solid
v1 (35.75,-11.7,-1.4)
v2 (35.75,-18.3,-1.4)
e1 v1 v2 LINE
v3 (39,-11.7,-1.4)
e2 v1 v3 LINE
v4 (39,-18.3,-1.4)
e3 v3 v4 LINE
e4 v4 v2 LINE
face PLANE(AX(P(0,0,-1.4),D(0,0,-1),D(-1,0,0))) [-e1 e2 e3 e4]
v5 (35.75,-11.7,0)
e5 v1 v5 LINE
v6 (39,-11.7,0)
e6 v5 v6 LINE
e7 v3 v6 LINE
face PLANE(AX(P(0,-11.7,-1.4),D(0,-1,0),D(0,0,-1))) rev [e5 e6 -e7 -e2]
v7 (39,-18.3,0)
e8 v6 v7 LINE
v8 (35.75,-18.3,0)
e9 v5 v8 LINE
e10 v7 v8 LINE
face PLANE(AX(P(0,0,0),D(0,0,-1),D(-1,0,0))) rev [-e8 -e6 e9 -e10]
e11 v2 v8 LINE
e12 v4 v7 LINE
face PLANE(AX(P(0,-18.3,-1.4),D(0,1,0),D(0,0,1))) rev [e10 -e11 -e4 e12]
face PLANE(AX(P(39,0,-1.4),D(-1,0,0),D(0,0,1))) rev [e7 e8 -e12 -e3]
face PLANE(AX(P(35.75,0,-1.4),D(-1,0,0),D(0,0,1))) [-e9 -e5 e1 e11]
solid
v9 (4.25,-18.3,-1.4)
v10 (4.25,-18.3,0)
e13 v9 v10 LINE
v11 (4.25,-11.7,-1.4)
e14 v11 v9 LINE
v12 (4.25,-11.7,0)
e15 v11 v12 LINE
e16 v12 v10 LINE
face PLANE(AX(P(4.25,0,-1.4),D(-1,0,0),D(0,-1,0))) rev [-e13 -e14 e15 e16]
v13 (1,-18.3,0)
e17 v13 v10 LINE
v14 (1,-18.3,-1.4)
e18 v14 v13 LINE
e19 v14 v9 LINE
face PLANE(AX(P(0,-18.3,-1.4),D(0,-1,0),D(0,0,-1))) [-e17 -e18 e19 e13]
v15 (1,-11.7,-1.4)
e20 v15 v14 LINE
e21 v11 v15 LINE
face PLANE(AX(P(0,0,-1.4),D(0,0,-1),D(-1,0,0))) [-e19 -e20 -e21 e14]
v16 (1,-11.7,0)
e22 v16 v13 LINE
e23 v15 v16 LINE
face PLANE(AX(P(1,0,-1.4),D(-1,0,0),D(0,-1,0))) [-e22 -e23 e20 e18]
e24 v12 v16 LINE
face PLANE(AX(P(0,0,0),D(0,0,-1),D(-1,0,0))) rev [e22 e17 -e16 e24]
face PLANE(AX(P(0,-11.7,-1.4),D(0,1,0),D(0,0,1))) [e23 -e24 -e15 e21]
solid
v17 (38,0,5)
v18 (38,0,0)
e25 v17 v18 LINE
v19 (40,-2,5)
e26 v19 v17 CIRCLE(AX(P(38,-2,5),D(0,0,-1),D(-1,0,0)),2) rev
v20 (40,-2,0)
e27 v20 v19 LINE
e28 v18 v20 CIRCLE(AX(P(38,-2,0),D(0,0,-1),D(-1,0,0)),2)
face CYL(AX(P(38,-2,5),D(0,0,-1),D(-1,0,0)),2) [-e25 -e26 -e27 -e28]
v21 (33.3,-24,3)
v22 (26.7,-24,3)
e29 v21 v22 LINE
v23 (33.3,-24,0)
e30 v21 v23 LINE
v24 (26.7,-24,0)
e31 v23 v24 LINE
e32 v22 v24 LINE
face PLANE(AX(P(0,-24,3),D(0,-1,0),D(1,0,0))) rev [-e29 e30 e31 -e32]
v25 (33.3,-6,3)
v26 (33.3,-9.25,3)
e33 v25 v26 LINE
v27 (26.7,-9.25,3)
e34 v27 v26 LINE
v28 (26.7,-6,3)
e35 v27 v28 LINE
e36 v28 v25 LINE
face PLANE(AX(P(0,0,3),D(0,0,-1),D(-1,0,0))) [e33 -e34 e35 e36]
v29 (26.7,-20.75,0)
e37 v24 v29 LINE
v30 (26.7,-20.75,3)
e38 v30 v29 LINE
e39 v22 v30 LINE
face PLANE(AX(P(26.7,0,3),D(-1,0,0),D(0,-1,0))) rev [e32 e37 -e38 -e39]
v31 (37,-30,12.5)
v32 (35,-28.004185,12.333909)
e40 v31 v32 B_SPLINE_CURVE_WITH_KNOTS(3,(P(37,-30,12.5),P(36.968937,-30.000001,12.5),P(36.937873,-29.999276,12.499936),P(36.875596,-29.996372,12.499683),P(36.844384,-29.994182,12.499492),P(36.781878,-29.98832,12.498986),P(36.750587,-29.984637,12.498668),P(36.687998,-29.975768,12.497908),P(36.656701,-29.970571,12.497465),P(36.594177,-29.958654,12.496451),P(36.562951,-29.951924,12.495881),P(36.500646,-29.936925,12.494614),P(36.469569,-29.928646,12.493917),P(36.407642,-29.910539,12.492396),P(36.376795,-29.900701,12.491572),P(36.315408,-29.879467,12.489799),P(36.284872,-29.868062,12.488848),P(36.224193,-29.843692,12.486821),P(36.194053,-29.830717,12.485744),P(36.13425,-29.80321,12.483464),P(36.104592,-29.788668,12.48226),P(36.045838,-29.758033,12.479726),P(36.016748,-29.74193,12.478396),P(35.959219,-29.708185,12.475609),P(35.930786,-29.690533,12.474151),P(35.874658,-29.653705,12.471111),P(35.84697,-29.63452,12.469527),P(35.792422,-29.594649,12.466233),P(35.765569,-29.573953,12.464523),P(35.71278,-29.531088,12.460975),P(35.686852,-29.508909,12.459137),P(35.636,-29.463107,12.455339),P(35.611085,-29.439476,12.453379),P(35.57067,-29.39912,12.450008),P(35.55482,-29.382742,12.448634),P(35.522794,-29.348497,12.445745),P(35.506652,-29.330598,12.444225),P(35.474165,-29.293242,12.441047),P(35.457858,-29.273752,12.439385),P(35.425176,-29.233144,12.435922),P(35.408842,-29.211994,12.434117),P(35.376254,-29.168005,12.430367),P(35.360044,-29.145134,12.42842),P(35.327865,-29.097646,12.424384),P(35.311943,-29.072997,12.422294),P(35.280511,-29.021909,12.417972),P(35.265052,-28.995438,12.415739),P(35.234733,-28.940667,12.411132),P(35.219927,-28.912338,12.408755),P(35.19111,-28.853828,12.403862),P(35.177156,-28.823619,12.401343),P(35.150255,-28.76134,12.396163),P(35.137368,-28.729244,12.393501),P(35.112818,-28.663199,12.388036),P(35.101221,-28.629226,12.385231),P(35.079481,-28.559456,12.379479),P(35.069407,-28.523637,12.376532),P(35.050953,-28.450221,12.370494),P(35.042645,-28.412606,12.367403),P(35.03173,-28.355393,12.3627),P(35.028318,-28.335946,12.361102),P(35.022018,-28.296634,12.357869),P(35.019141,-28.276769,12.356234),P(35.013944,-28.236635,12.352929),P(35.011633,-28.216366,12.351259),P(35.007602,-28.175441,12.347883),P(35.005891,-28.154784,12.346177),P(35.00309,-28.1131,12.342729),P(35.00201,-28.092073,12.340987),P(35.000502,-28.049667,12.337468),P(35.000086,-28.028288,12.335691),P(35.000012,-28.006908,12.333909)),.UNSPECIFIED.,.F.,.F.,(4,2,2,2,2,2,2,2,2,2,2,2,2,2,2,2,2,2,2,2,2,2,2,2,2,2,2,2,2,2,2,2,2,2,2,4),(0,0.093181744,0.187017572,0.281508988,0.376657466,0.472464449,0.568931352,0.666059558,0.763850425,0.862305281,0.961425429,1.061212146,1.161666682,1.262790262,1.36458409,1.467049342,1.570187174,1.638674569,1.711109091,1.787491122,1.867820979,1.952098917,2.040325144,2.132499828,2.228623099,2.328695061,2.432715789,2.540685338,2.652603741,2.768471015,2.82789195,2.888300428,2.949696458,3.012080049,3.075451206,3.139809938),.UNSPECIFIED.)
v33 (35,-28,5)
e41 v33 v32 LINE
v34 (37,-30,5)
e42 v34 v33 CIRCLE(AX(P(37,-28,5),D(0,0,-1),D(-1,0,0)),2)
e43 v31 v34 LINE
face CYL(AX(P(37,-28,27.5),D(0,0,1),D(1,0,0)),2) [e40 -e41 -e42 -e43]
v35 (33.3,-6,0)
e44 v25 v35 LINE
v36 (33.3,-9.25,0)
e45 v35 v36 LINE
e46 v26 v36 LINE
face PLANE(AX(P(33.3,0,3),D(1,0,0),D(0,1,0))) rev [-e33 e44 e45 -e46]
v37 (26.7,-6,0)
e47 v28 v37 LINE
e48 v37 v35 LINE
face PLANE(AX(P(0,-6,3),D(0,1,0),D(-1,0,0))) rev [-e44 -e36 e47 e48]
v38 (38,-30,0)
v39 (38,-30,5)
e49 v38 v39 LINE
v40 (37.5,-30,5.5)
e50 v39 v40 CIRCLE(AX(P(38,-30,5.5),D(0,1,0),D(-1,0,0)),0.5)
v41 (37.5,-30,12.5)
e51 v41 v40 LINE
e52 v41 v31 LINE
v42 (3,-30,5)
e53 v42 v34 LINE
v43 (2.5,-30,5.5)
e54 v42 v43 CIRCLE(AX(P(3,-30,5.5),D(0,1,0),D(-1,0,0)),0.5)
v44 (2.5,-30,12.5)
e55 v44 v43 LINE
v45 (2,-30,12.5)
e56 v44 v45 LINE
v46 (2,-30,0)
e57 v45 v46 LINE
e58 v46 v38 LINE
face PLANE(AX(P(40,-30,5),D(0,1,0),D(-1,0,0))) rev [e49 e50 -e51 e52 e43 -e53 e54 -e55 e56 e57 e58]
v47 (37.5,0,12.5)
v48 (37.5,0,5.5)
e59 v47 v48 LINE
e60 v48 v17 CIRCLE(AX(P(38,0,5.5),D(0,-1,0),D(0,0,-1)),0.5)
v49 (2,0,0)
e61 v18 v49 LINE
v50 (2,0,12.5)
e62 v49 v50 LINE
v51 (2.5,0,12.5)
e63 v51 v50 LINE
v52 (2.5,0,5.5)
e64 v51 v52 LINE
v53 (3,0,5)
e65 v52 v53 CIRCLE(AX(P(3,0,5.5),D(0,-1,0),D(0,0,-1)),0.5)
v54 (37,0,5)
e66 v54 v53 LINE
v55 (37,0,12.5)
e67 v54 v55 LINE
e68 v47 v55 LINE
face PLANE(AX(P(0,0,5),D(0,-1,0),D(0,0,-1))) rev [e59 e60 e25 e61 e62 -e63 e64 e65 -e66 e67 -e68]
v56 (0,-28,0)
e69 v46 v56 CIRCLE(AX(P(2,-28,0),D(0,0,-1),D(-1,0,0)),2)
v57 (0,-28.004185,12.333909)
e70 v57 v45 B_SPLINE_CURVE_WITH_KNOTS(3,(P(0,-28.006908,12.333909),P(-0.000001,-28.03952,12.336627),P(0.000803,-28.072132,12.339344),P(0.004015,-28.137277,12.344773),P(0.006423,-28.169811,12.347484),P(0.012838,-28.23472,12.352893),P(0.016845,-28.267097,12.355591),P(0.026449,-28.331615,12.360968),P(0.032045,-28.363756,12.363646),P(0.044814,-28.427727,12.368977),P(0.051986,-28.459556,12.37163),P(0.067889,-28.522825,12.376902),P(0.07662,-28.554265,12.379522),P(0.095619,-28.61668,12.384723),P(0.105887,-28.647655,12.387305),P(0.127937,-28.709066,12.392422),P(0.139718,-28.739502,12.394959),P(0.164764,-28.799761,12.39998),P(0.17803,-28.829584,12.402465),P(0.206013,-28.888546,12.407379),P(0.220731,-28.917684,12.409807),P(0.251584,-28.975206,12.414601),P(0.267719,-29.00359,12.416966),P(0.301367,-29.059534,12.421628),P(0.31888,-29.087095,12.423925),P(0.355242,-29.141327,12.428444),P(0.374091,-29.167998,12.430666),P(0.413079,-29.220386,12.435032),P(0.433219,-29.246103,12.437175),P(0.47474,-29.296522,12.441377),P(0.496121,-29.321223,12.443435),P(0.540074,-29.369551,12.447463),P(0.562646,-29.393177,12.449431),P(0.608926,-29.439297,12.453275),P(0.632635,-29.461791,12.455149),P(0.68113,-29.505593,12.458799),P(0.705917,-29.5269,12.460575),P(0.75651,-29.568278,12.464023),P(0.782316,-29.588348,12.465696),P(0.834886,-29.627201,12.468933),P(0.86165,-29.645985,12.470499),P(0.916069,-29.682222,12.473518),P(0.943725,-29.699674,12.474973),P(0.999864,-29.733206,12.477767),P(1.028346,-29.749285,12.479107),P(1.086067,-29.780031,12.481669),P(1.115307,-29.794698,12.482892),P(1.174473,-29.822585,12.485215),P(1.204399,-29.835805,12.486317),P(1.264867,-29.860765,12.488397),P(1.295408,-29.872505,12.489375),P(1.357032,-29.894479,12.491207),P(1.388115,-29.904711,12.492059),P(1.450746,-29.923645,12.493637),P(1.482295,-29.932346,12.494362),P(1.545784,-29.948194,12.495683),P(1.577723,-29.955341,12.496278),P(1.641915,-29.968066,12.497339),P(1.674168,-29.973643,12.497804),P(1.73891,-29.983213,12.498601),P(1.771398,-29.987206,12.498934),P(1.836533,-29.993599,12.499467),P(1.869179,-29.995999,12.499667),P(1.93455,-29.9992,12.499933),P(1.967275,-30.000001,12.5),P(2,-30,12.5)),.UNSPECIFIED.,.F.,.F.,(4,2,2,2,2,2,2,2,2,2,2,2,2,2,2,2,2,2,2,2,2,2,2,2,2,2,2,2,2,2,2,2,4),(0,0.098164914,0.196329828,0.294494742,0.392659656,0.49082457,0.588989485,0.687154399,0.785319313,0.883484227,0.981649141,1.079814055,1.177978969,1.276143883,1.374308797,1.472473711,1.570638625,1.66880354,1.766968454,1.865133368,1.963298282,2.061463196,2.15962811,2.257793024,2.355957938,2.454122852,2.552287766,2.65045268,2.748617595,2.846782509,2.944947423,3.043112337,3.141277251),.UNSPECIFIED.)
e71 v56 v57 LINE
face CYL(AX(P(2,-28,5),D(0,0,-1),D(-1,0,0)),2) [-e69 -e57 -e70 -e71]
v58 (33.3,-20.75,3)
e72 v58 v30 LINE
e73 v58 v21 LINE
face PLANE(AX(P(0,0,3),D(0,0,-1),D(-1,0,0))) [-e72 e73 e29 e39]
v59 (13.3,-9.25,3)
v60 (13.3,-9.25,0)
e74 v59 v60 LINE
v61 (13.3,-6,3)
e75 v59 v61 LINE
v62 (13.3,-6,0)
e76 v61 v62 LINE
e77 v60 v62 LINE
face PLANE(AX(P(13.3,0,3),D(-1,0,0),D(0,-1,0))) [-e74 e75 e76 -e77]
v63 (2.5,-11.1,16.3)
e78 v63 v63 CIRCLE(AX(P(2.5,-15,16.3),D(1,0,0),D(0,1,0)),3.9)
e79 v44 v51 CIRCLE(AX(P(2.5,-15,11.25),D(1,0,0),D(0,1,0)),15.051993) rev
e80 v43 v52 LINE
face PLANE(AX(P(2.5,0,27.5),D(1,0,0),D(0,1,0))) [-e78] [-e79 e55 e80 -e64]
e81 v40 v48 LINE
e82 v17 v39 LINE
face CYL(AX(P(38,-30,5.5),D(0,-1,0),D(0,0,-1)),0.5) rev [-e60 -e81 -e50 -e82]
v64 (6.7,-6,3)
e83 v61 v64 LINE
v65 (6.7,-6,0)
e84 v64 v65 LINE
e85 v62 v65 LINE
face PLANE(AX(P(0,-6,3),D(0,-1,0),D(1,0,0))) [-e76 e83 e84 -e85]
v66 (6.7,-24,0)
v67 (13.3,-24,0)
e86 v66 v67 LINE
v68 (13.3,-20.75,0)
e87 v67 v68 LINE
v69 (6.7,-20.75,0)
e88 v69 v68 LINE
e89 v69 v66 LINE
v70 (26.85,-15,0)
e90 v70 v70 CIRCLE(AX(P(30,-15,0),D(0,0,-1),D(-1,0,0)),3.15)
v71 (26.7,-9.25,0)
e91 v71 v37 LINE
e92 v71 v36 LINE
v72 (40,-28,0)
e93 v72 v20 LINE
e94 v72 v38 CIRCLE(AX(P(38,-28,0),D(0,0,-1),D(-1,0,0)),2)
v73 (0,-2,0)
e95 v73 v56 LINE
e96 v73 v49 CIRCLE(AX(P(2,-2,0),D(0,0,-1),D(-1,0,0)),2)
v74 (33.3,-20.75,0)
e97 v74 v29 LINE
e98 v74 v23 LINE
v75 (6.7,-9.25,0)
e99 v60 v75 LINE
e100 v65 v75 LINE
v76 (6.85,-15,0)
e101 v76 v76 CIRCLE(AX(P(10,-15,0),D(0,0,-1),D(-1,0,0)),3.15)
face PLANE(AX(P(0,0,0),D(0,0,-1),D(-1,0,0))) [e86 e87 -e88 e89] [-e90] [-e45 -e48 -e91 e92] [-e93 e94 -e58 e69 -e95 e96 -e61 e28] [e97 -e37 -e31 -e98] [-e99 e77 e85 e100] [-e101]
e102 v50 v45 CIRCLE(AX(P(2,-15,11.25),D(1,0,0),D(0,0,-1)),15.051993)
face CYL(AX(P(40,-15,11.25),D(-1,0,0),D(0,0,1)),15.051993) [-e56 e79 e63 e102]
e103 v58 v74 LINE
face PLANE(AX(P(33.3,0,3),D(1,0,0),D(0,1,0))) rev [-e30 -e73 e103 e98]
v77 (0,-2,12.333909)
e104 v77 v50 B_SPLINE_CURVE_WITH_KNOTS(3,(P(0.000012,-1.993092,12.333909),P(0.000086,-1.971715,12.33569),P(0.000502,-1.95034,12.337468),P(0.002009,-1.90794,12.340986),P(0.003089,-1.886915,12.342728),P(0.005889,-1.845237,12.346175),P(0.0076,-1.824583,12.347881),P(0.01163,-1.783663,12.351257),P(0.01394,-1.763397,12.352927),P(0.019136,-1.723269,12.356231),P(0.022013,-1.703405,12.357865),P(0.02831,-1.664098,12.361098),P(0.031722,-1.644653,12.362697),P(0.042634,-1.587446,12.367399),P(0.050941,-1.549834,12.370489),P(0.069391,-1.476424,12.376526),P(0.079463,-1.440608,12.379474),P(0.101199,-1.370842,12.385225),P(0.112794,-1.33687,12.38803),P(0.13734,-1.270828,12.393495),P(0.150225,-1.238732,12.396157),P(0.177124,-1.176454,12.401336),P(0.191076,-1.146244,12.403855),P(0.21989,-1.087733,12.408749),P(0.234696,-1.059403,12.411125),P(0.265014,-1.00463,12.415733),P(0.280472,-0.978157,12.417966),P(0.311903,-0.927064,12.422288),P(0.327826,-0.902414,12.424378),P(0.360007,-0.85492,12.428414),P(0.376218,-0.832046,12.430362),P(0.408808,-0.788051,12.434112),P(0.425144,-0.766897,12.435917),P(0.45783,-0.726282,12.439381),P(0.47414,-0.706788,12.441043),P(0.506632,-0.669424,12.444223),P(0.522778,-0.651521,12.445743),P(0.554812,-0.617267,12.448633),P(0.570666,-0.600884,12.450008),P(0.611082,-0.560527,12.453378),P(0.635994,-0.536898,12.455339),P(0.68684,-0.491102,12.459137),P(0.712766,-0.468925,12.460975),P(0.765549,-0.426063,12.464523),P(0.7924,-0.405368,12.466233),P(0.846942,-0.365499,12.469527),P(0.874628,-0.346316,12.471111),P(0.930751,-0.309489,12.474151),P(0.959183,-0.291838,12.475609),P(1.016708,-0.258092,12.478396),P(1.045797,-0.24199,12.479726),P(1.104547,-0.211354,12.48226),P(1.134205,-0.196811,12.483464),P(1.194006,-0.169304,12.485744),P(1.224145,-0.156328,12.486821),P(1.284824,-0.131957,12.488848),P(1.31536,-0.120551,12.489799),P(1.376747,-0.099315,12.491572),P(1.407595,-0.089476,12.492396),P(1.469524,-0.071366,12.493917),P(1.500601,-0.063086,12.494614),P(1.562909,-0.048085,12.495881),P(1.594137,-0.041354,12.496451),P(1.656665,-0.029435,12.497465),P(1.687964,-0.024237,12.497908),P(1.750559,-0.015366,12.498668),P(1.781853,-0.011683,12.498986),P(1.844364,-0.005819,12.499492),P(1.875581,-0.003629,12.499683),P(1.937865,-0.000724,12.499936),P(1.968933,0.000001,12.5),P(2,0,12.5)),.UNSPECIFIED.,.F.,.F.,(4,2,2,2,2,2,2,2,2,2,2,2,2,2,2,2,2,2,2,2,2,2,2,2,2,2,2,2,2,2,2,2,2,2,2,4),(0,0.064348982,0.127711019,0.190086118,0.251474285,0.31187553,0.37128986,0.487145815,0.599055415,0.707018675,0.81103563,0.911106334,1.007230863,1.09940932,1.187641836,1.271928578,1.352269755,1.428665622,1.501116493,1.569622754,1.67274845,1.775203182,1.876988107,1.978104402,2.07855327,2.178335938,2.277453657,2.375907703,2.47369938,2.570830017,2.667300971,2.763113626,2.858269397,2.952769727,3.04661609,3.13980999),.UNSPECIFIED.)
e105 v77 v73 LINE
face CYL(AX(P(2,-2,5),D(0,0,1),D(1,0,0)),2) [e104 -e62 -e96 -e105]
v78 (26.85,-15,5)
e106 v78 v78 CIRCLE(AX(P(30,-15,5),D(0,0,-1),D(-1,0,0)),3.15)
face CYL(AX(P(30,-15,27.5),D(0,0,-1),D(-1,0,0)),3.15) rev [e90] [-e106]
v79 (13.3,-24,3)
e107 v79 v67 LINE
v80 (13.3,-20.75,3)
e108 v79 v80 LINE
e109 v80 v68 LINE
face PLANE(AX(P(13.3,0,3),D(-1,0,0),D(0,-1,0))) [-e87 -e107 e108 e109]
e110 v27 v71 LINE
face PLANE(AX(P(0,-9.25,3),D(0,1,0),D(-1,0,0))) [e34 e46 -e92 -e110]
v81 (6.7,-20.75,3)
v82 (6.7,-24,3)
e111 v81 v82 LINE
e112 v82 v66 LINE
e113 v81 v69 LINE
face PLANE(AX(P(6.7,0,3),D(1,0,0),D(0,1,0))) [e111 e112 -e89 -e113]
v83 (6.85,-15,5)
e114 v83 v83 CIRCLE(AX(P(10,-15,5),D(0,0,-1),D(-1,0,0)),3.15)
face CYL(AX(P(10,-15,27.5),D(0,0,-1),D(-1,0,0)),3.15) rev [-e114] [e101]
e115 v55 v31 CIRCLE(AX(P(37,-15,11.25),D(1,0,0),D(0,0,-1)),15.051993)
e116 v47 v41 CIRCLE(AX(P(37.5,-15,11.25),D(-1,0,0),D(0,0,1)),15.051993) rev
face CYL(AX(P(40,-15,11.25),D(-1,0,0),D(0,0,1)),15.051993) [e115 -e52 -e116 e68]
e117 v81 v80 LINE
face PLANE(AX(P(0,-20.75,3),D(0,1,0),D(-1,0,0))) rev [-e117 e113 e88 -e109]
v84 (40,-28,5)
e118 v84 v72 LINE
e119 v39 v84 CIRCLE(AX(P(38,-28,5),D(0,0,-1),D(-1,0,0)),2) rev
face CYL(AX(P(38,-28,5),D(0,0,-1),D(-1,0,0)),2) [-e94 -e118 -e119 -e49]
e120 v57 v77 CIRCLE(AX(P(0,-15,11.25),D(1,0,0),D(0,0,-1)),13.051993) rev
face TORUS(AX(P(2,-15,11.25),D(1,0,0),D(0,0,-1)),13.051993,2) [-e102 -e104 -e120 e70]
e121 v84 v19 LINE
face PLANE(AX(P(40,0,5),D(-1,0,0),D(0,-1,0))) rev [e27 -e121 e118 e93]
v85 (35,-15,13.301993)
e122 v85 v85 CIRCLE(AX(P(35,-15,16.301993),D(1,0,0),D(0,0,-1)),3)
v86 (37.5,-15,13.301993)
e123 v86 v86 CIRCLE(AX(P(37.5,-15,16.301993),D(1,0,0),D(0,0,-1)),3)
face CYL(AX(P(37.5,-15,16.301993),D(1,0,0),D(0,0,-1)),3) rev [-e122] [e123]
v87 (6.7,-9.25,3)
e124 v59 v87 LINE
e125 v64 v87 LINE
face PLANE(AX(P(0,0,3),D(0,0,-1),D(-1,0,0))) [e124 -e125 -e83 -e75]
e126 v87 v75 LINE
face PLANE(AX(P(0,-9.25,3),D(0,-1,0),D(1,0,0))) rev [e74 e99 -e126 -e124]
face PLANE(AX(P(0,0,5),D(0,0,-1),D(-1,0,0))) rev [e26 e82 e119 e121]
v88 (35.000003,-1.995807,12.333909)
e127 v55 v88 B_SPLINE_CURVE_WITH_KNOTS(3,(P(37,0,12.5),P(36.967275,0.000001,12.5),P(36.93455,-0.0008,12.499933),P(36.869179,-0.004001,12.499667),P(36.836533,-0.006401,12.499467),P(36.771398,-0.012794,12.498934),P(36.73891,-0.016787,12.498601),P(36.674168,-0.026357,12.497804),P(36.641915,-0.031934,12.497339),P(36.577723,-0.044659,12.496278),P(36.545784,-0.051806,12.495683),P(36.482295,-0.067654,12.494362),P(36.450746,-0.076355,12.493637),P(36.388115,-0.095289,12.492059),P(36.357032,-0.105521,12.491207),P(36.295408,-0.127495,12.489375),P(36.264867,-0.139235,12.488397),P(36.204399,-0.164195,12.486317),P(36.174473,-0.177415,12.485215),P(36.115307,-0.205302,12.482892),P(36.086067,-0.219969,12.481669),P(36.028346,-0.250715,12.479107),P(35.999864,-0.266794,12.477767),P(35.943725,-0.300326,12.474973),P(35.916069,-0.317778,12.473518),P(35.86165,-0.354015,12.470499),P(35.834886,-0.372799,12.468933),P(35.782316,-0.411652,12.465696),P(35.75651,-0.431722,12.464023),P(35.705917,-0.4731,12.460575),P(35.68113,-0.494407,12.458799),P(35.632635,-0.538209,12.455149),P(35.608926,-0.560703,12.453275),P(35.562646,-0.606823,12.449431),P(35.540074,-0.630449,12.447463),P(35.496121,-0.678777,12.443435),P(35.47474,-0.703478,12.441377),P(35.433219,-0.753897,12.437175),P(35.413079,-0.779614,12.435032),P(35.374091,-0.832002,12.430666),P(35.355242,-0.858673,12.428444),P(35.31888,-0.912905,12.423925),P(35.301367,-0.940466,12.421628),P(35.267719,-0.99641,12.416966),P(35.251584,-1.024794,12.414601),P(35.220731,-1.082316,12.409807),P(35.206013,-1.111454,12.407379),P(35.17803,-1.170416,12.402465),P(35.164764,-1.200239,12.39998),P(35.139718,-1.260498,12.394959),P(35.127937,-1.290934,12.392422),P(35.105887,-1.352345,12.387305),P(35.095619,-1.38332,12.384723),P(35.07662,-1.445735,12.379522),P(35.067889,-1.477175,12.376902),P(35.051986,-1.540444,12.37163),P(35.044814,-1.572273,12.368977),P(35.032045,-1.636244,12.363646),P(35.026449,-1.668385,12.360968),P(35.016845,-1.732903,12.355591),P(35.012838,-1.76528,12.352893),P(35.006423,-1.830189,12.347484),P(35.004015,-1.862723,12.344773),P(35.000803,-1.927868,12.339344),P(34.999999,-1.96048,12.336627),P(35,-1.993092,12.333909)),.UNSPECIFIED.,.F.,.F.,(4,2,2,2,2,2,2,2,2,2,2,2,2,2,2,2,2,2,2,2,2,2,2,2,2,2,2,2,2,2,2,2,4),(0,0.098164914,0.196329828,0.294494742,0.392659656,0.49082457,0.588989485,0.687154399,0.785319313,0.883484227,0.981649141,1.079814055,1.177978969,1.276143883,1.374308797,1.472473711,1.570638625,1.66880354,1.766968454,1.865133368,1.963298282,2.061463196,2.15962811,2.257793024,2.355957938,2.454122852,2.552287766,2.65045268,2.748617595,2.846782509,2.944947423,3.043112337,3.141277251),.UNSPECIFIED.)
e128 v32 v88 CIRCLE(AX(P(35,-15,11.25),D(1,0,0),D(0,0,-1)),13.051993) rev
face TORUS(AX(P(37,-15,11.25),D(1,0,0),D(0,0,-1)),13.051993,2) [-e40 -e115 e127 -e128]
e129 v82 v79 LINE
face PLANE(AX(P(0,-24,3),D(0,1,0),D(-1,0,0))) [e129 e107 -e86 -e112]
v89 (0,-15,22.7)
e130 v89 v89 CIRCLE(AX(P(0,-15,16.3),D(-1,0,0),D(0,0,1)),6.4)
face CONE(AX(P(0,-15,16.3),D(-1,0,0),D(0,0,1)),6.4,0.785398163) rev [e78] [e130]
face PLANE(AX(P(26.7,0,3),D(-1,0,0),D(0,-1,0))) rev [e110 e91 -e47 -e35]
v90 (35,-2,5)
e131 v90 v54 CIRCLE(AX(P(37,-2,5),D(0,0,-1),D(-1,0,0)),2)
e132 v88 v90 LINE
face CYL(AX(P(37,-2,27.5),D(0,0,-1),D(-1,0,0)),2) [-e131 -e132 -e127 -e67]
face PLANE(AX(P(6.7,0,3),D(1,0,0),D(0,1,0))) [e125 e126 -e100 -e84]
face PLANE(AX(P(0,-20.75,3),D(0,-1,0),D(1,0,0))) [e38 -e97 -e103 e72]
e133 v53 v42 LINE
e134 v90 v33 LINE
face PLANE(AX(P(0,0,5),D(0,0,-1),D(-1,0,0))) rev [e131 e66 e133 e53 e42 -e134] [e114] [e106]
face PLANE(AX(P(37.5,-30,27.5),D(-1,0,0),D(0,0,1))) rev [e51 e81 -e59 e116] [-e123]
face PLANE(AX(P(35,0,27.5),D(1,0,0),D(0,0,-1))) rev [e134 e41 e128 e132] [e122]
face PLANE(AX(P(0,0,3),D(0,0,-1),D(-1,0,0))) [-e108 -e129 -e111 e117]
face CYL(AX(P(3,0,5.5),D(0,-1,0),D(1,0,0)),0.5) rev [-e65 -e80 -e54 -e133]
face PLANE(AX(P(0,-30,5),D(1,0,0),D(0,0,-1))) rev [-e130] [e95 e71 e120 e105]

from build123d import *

# Parameters (mm, degrees)
SKETCH_1_W          = 40
SKETCH_1_H          = 30
EXTRUDE_1_DEPTH     = 5
SKETCH_2_W          = 2.5
SKETCH_2_H          = 30
EXTRUDE_2_DEPTH     = 27.5
SKETCH_3_W          = 6.6
SKETCH_3_H          = 3.25
CUT_EXTRUDE_1_DEPTH = 3
CUT_EXTRUDE_2_DEPTH = 58.063561053
SKETCH_3_4_W        = 3.25
SKETCH_3_4_H        = 3.3
EXTRUDE_3_DEPTH     = 1.4
SKETCH_4_W          = 2.5
SKETCH_4_H          = 30
EXTRUDE_4_DEPTH     = 22.5
CUT_EXTRUDE_3_DEPTH = 58.063561053
SKETCH_8_W          = 3
SKETCH_8_H          = 2.501
FILLET_3_R          = 0.5
FILLET_4_R          = 2


with BuildPart() as part:
    # 草图1 → 凸台-拉伸1 (new body)
    with BuildSketch(Plane.XY):
        with Locations((20, -15)):
            Rectangle(SKETCH_1_W, SKETCH_1_H)
    extrude(amount=EXTRUDE_1_DEPTH)

    # 草图2 → 凸台-拉伸2 (add)
    with BuildSketch(Plane.XY):
        with Locations((1.25, -15)):
            Rectangle(SKETCH_2_W, SKETCH_2_H)
    extrude(amount=EXTRUDE_2_DEPTH)

    # 草图3 → 切除-拉伸1 (cut)
    with BuildSketch(Plane(origin=(0, 0, 0), x_dir=(-1, 0, 0), z_dir=(0, 0, -1))):
        with Locations((-30, -7.625)):
            Rectangle(SKETCH_3_W, SKETCH_3_H)
        with Locations((-30, -22.375)):
            Rectangle(SKETCH_3_W, SKETCH_3_H)
        with Locations((-10, -22.375)):
            Rectangle(SKETCH_3_W, SKETCH_3_H)
        with Locations((-10, -7.625)):
            Rectangle(SKETCH_3_W, SKETCH_3_H)
    extrude(amount=-CUT_EXTRUDE_1_DEPTH, mode=Mode.SUBTRACT)

    # 草图3<3> → 切除-拉伸2 (cut, through all)
    with BuildSketch(Plane(origin=(0, 0, 0), x_dir=(-1, 0, 0), z_dir=(0, 0, -1))):
        with BuildLine():
            ThreePointArc((-33.15, -15), (-30, -18.15), (-26.85, -15))
            Line((-26.85, -15), (-33.15, -15))
        make_face()
        with BuildLine():
            Line((-33.15, -15), (-26.85, -15))
            ThreePointArc((-26.85, -15), (-30, -11.85), (-33.15, -15))
        make_face()
        with BuildLine():
            ThreePointArc((-13.15, -15), (-10, -18.15), (-6.85, -15))
            Line((-6.85, -15), (-13.15, -15))
        make_face()
        with BuildLine():
            Line((-13.15, -15), (-6.85, -15))
            ThreePointArc((-6.85, -15), (-10, -11.85), (-13.15, -15))
        make_face()
    extrude(amount=-CUT_EXTRUDE_2_DEPTH, mode=Mode.SUBTRACT)

    # 草图4 → 凸台-拉伸4 (add)
    with BuildSketch(Plane.XY.offset(5)):
        with Locations((36.25, -15)):
            Rectangle(SKETCH_4_W, SKETCH_4_H)
    extrude(amount=EXTRUDE_4_DEPTH)

    # 草图5 → 切除-拉伸3 (cut, through all)
    with BuildSketch(Plane.ZY):
        with BuildLine():
            Line((27.5, 0), (12.5, 0))
            ThreePointArc((12.5, 0), (26.301993223, -15), (12.5, -30))
            Line((12.5, -30), (27.5, -30))
            Line((27.5, -30), (27.5, 0))
        make_face()
    extrude(amount=-CUT_EXTRUDE_3_DEPTH, mode=Mode.SUBTRACT)

    # 草图8 → Hole Wizard M6 _1 (revolve, cut)
    with BuildSketch(Plane(origin=(37.5, -15, 16.301993223), x_dir=(0, 0, -1), z_dir=(0, 1, 0))):
        with Locations((1.5, 1.2505)):
            Rectangle(SKETCH_8_W, SKETCH_8_H)
    revolve(axis=Axis((43.85, -15, 16.301993223), (-1, 0, 0)), mode=Mode.SUBTRACT)

    # 草图10 → Hole Wizard M6 _1 2 (revolve, cut)
    with BuildSketch(Plane(origin=(0, -15, 16.3), x_dir=(0, 0, 1), z_dir=(0, 1, 0))):
        Polygon((0, 0), (0, 2.501), (3.3, 2.501), (3.3, 3.1), (6.4, 0), align=None)
    revolve(axis=Axis((-6.35, -15, 16.3), (1, 0, 0)), mode=Mode.SUBTRACT)

    # 圆角3
    fillet_3_edges = [part.edges().sort_by_distance(p)[0] for p in [
        (2.5, -15, 5),
        (37.5, -15, 5),
    ]]
    fillet(fillet_3_edges, radius=FILLET_3_R)

    # 圆角4
    # the kernel refuses this fillet: 2 mm, written as the material it takes off along each edge
    with BuildSketch(Plane(origin=(35, -30, 5), x_dir=(0, 1, 0), z_dir=(0, 0, 1)), Plane(origin=(35, 0, 5), x_dir=(1, 0, 0), z_dir=(0, 0, 1))) as fillet_4_piece_1:
        with BuildLine():
            CenterArc((FILLET_4_R, -FILLET_4_R), FILLET_4_R, 90, 90)
            Line((0, -FILLET_4_R), (-FILLET_4_R * 0.02, -FILLET_4_R))
            Line((-FILLET_4_R * 0.02, -FILLET_4_R), (-FILLET_4_R * 0.02, FILLET_4_R * 0.02))
            Line((-FILLET_4_R * 0.02, FILLET_4_R * 0.02), (FILLET_4_R, FILLET_4_R * 0.02))
            Line((FILLET_4_R, FILLET_4_R * 0.02), (FILLET_4_R, 0))
        make_face()
    extrude(amount=9.5, mode=Mode.SUBTRACT)
    with BuildSketch(Plane(origin=(0, 0, -2), x_dir=(1, 0, 0), z_dir=(0, 0, 1)), Plane(origin=(0, -30, -2), x_dir=(0, 1, 0), z_dir=(0, 0, 1))) as fillet_4_piece_2:
        with BuildLine():
            CenterArc((FILLET_4_R, -FILLET_4_R), FILLET_4_R, 90, 90)
            Line((0, -FILLET_4_R), (-FILLET_4_R * 0.02, -FILLET_4_R))
            Line((-FILLET_4_R * 0.02, -FILLET_4_R), (-FILLET_4_R * 0.02, FILLET_4_R * 0.02))
            Line((-FILLET_4_R * 0.02, FILLET_4_R * 0.02), (FILLET_4_R, FILLET_4_R * 0.02))
            Line((FILLET_4_R, FILLET_4_R * 0.02), (FILLET_4_R, 0))
        make_face()
    extrude(amount=16.5, mode=Mode.SUBTRACT)
    with BuildSketch(Plane(origin=(35, -15, 11.25), x_dir=(0, -0.998754097024609, -0.04990244158914389), z_dir=(0, 0.04990244158914389, -0.998754097024609))) as fillet_4_piece_3:
        with BuildLine():
            CenterArc((15.051993223 - FILLET_4_R, -FILLET_4_R), FILLET_4_R, 0, 90)
            Line((15.051993223 - FILLET_4_R, 0), (15.051993223 - FILLET_4_R, FILLET_4_R * 0.02))
            Line((15.051993223 - FILLET_4_R, FILLET_4_R * 0.02), (15.051993223 + FILLET_4_R * 0.02, FILLET_4_R * 0.02))
            Line((15.051993223 + FILLET_4_R * 0.02, FILLET_4_R * 0.02), (15.051993223 + FILLET_4_R * 0.02, -FILLET_4_R))
            Line((15.051993223 + FILLET_4_R * 0.02, -FILLET_4_R), (15.051993223, -FILLET_4_R))
        make_face()
    revolve(axis=Axis((35, -15, 11.25), (-1, 0, 0)), revolution_arc=185.720774622, mode=Mode.SUBTRACT)
    with BuildSketch(Plane(origin=(0, -15, 11.25), x_dir=(0, 0.9987540970246119, -0.04990244158908723), z_dir=(0, -0.04990244158908723, -0.9987540970246119))) as fillet_4_piece_4:
        with BuildLine():
            CenterArc((15.051993223 - FILLET_4_R, FILLET_4_R), FILLET_4_R, 270, 90)
            Line((15.051993223, FILLET_4_R), (15.051993223 + FILLET_4_R * 0.02, FILLET_4_R))
            Line((15.051993223 + FILLET_4_R * 0.02, FILLET_4_R), (15.051993223 + FILLET_4_R * 0.02, -FILLET_4_R * 0.02))
            Line((15.051993223 + FILLET_4_R * 0.02, -FILLET_4_R * 0.02), (15.051993223 - FILLET_4_R, -FILLET_4_R * 0.02))
            Line((15.051993223 - FILLET_4_R, -FILLET_4_R * 0.02), (15.051993223 - FILLET_4_R, 0))
        make_face()
    revolve(axis=Axis((0, -15, 11.25), (1, 0, 0)), revolution_arc=185.720774622, mode=Mode.SUBTRACT)
    with BuildSketch(Plane(origin=(40, 0, -2), x_dir=(-1, 0, 0), z_dir=(0, 0, 1)), Plane(origin=(40, -30, -2), x_dir=(0, 1, 0), z_dir=(0, 0, 1))) as fillet_4_piece_5:
        with BuildLine():
            CenterArc((FILLET_4_R, FILLET_4_R), FILLET_4_R, 180, 90)
            Line((0, FILLET_4_R), (-FILLET_4_R * 0.02, FILLET_4_R))
            Line((-FILLET_4_R * 0.02, FILLET_4_R), (-FILLET_4_R * 0.02, -FILLET_4_R * 0.02))
            Line((-FILLET_4_R * 0.02, -FILLET_4_R * 0.02), (FILLET_4_R, -FILLET_4_R * 0.02))
            Line((FILLET_4_R, -FILLET_4_R * 0.02), (FILLET_4_R, 0))
        make_face()
    extrude(amount=9, mode=Mode.SUBTRACT)


with BuildPart() as body_2:
    # 草图3<4> → 凸台-拉伸3 (new body)
    with BuildSketch(Plane(origin=(0, 0, 0), x_dir=(-1, 0, 0), z_dir=(0, 0, -1))):
        with Locations((-37.375, -13.35)):
            Rectangle(SKETCH_3_4_W, SKETCH_3_4_H)
        with Locations((-37.375, -16.65)):
            Rectangle(SKETCH_3_4_W, SKETCH_3_4_H)
        with Locations((-2.625, -13.35)):
            Rectangle(SKETCH_3_4_W, SKETCH_3_4_H)
        with Locations((-2.625, -16.65)):
            Rectangle(SKETCH_3_4_W, SKETCH_3_4_H)
    extrude(amount=EXTRUDE_3_DEPTH)


solid = Compound([part.part, body_2.part])
